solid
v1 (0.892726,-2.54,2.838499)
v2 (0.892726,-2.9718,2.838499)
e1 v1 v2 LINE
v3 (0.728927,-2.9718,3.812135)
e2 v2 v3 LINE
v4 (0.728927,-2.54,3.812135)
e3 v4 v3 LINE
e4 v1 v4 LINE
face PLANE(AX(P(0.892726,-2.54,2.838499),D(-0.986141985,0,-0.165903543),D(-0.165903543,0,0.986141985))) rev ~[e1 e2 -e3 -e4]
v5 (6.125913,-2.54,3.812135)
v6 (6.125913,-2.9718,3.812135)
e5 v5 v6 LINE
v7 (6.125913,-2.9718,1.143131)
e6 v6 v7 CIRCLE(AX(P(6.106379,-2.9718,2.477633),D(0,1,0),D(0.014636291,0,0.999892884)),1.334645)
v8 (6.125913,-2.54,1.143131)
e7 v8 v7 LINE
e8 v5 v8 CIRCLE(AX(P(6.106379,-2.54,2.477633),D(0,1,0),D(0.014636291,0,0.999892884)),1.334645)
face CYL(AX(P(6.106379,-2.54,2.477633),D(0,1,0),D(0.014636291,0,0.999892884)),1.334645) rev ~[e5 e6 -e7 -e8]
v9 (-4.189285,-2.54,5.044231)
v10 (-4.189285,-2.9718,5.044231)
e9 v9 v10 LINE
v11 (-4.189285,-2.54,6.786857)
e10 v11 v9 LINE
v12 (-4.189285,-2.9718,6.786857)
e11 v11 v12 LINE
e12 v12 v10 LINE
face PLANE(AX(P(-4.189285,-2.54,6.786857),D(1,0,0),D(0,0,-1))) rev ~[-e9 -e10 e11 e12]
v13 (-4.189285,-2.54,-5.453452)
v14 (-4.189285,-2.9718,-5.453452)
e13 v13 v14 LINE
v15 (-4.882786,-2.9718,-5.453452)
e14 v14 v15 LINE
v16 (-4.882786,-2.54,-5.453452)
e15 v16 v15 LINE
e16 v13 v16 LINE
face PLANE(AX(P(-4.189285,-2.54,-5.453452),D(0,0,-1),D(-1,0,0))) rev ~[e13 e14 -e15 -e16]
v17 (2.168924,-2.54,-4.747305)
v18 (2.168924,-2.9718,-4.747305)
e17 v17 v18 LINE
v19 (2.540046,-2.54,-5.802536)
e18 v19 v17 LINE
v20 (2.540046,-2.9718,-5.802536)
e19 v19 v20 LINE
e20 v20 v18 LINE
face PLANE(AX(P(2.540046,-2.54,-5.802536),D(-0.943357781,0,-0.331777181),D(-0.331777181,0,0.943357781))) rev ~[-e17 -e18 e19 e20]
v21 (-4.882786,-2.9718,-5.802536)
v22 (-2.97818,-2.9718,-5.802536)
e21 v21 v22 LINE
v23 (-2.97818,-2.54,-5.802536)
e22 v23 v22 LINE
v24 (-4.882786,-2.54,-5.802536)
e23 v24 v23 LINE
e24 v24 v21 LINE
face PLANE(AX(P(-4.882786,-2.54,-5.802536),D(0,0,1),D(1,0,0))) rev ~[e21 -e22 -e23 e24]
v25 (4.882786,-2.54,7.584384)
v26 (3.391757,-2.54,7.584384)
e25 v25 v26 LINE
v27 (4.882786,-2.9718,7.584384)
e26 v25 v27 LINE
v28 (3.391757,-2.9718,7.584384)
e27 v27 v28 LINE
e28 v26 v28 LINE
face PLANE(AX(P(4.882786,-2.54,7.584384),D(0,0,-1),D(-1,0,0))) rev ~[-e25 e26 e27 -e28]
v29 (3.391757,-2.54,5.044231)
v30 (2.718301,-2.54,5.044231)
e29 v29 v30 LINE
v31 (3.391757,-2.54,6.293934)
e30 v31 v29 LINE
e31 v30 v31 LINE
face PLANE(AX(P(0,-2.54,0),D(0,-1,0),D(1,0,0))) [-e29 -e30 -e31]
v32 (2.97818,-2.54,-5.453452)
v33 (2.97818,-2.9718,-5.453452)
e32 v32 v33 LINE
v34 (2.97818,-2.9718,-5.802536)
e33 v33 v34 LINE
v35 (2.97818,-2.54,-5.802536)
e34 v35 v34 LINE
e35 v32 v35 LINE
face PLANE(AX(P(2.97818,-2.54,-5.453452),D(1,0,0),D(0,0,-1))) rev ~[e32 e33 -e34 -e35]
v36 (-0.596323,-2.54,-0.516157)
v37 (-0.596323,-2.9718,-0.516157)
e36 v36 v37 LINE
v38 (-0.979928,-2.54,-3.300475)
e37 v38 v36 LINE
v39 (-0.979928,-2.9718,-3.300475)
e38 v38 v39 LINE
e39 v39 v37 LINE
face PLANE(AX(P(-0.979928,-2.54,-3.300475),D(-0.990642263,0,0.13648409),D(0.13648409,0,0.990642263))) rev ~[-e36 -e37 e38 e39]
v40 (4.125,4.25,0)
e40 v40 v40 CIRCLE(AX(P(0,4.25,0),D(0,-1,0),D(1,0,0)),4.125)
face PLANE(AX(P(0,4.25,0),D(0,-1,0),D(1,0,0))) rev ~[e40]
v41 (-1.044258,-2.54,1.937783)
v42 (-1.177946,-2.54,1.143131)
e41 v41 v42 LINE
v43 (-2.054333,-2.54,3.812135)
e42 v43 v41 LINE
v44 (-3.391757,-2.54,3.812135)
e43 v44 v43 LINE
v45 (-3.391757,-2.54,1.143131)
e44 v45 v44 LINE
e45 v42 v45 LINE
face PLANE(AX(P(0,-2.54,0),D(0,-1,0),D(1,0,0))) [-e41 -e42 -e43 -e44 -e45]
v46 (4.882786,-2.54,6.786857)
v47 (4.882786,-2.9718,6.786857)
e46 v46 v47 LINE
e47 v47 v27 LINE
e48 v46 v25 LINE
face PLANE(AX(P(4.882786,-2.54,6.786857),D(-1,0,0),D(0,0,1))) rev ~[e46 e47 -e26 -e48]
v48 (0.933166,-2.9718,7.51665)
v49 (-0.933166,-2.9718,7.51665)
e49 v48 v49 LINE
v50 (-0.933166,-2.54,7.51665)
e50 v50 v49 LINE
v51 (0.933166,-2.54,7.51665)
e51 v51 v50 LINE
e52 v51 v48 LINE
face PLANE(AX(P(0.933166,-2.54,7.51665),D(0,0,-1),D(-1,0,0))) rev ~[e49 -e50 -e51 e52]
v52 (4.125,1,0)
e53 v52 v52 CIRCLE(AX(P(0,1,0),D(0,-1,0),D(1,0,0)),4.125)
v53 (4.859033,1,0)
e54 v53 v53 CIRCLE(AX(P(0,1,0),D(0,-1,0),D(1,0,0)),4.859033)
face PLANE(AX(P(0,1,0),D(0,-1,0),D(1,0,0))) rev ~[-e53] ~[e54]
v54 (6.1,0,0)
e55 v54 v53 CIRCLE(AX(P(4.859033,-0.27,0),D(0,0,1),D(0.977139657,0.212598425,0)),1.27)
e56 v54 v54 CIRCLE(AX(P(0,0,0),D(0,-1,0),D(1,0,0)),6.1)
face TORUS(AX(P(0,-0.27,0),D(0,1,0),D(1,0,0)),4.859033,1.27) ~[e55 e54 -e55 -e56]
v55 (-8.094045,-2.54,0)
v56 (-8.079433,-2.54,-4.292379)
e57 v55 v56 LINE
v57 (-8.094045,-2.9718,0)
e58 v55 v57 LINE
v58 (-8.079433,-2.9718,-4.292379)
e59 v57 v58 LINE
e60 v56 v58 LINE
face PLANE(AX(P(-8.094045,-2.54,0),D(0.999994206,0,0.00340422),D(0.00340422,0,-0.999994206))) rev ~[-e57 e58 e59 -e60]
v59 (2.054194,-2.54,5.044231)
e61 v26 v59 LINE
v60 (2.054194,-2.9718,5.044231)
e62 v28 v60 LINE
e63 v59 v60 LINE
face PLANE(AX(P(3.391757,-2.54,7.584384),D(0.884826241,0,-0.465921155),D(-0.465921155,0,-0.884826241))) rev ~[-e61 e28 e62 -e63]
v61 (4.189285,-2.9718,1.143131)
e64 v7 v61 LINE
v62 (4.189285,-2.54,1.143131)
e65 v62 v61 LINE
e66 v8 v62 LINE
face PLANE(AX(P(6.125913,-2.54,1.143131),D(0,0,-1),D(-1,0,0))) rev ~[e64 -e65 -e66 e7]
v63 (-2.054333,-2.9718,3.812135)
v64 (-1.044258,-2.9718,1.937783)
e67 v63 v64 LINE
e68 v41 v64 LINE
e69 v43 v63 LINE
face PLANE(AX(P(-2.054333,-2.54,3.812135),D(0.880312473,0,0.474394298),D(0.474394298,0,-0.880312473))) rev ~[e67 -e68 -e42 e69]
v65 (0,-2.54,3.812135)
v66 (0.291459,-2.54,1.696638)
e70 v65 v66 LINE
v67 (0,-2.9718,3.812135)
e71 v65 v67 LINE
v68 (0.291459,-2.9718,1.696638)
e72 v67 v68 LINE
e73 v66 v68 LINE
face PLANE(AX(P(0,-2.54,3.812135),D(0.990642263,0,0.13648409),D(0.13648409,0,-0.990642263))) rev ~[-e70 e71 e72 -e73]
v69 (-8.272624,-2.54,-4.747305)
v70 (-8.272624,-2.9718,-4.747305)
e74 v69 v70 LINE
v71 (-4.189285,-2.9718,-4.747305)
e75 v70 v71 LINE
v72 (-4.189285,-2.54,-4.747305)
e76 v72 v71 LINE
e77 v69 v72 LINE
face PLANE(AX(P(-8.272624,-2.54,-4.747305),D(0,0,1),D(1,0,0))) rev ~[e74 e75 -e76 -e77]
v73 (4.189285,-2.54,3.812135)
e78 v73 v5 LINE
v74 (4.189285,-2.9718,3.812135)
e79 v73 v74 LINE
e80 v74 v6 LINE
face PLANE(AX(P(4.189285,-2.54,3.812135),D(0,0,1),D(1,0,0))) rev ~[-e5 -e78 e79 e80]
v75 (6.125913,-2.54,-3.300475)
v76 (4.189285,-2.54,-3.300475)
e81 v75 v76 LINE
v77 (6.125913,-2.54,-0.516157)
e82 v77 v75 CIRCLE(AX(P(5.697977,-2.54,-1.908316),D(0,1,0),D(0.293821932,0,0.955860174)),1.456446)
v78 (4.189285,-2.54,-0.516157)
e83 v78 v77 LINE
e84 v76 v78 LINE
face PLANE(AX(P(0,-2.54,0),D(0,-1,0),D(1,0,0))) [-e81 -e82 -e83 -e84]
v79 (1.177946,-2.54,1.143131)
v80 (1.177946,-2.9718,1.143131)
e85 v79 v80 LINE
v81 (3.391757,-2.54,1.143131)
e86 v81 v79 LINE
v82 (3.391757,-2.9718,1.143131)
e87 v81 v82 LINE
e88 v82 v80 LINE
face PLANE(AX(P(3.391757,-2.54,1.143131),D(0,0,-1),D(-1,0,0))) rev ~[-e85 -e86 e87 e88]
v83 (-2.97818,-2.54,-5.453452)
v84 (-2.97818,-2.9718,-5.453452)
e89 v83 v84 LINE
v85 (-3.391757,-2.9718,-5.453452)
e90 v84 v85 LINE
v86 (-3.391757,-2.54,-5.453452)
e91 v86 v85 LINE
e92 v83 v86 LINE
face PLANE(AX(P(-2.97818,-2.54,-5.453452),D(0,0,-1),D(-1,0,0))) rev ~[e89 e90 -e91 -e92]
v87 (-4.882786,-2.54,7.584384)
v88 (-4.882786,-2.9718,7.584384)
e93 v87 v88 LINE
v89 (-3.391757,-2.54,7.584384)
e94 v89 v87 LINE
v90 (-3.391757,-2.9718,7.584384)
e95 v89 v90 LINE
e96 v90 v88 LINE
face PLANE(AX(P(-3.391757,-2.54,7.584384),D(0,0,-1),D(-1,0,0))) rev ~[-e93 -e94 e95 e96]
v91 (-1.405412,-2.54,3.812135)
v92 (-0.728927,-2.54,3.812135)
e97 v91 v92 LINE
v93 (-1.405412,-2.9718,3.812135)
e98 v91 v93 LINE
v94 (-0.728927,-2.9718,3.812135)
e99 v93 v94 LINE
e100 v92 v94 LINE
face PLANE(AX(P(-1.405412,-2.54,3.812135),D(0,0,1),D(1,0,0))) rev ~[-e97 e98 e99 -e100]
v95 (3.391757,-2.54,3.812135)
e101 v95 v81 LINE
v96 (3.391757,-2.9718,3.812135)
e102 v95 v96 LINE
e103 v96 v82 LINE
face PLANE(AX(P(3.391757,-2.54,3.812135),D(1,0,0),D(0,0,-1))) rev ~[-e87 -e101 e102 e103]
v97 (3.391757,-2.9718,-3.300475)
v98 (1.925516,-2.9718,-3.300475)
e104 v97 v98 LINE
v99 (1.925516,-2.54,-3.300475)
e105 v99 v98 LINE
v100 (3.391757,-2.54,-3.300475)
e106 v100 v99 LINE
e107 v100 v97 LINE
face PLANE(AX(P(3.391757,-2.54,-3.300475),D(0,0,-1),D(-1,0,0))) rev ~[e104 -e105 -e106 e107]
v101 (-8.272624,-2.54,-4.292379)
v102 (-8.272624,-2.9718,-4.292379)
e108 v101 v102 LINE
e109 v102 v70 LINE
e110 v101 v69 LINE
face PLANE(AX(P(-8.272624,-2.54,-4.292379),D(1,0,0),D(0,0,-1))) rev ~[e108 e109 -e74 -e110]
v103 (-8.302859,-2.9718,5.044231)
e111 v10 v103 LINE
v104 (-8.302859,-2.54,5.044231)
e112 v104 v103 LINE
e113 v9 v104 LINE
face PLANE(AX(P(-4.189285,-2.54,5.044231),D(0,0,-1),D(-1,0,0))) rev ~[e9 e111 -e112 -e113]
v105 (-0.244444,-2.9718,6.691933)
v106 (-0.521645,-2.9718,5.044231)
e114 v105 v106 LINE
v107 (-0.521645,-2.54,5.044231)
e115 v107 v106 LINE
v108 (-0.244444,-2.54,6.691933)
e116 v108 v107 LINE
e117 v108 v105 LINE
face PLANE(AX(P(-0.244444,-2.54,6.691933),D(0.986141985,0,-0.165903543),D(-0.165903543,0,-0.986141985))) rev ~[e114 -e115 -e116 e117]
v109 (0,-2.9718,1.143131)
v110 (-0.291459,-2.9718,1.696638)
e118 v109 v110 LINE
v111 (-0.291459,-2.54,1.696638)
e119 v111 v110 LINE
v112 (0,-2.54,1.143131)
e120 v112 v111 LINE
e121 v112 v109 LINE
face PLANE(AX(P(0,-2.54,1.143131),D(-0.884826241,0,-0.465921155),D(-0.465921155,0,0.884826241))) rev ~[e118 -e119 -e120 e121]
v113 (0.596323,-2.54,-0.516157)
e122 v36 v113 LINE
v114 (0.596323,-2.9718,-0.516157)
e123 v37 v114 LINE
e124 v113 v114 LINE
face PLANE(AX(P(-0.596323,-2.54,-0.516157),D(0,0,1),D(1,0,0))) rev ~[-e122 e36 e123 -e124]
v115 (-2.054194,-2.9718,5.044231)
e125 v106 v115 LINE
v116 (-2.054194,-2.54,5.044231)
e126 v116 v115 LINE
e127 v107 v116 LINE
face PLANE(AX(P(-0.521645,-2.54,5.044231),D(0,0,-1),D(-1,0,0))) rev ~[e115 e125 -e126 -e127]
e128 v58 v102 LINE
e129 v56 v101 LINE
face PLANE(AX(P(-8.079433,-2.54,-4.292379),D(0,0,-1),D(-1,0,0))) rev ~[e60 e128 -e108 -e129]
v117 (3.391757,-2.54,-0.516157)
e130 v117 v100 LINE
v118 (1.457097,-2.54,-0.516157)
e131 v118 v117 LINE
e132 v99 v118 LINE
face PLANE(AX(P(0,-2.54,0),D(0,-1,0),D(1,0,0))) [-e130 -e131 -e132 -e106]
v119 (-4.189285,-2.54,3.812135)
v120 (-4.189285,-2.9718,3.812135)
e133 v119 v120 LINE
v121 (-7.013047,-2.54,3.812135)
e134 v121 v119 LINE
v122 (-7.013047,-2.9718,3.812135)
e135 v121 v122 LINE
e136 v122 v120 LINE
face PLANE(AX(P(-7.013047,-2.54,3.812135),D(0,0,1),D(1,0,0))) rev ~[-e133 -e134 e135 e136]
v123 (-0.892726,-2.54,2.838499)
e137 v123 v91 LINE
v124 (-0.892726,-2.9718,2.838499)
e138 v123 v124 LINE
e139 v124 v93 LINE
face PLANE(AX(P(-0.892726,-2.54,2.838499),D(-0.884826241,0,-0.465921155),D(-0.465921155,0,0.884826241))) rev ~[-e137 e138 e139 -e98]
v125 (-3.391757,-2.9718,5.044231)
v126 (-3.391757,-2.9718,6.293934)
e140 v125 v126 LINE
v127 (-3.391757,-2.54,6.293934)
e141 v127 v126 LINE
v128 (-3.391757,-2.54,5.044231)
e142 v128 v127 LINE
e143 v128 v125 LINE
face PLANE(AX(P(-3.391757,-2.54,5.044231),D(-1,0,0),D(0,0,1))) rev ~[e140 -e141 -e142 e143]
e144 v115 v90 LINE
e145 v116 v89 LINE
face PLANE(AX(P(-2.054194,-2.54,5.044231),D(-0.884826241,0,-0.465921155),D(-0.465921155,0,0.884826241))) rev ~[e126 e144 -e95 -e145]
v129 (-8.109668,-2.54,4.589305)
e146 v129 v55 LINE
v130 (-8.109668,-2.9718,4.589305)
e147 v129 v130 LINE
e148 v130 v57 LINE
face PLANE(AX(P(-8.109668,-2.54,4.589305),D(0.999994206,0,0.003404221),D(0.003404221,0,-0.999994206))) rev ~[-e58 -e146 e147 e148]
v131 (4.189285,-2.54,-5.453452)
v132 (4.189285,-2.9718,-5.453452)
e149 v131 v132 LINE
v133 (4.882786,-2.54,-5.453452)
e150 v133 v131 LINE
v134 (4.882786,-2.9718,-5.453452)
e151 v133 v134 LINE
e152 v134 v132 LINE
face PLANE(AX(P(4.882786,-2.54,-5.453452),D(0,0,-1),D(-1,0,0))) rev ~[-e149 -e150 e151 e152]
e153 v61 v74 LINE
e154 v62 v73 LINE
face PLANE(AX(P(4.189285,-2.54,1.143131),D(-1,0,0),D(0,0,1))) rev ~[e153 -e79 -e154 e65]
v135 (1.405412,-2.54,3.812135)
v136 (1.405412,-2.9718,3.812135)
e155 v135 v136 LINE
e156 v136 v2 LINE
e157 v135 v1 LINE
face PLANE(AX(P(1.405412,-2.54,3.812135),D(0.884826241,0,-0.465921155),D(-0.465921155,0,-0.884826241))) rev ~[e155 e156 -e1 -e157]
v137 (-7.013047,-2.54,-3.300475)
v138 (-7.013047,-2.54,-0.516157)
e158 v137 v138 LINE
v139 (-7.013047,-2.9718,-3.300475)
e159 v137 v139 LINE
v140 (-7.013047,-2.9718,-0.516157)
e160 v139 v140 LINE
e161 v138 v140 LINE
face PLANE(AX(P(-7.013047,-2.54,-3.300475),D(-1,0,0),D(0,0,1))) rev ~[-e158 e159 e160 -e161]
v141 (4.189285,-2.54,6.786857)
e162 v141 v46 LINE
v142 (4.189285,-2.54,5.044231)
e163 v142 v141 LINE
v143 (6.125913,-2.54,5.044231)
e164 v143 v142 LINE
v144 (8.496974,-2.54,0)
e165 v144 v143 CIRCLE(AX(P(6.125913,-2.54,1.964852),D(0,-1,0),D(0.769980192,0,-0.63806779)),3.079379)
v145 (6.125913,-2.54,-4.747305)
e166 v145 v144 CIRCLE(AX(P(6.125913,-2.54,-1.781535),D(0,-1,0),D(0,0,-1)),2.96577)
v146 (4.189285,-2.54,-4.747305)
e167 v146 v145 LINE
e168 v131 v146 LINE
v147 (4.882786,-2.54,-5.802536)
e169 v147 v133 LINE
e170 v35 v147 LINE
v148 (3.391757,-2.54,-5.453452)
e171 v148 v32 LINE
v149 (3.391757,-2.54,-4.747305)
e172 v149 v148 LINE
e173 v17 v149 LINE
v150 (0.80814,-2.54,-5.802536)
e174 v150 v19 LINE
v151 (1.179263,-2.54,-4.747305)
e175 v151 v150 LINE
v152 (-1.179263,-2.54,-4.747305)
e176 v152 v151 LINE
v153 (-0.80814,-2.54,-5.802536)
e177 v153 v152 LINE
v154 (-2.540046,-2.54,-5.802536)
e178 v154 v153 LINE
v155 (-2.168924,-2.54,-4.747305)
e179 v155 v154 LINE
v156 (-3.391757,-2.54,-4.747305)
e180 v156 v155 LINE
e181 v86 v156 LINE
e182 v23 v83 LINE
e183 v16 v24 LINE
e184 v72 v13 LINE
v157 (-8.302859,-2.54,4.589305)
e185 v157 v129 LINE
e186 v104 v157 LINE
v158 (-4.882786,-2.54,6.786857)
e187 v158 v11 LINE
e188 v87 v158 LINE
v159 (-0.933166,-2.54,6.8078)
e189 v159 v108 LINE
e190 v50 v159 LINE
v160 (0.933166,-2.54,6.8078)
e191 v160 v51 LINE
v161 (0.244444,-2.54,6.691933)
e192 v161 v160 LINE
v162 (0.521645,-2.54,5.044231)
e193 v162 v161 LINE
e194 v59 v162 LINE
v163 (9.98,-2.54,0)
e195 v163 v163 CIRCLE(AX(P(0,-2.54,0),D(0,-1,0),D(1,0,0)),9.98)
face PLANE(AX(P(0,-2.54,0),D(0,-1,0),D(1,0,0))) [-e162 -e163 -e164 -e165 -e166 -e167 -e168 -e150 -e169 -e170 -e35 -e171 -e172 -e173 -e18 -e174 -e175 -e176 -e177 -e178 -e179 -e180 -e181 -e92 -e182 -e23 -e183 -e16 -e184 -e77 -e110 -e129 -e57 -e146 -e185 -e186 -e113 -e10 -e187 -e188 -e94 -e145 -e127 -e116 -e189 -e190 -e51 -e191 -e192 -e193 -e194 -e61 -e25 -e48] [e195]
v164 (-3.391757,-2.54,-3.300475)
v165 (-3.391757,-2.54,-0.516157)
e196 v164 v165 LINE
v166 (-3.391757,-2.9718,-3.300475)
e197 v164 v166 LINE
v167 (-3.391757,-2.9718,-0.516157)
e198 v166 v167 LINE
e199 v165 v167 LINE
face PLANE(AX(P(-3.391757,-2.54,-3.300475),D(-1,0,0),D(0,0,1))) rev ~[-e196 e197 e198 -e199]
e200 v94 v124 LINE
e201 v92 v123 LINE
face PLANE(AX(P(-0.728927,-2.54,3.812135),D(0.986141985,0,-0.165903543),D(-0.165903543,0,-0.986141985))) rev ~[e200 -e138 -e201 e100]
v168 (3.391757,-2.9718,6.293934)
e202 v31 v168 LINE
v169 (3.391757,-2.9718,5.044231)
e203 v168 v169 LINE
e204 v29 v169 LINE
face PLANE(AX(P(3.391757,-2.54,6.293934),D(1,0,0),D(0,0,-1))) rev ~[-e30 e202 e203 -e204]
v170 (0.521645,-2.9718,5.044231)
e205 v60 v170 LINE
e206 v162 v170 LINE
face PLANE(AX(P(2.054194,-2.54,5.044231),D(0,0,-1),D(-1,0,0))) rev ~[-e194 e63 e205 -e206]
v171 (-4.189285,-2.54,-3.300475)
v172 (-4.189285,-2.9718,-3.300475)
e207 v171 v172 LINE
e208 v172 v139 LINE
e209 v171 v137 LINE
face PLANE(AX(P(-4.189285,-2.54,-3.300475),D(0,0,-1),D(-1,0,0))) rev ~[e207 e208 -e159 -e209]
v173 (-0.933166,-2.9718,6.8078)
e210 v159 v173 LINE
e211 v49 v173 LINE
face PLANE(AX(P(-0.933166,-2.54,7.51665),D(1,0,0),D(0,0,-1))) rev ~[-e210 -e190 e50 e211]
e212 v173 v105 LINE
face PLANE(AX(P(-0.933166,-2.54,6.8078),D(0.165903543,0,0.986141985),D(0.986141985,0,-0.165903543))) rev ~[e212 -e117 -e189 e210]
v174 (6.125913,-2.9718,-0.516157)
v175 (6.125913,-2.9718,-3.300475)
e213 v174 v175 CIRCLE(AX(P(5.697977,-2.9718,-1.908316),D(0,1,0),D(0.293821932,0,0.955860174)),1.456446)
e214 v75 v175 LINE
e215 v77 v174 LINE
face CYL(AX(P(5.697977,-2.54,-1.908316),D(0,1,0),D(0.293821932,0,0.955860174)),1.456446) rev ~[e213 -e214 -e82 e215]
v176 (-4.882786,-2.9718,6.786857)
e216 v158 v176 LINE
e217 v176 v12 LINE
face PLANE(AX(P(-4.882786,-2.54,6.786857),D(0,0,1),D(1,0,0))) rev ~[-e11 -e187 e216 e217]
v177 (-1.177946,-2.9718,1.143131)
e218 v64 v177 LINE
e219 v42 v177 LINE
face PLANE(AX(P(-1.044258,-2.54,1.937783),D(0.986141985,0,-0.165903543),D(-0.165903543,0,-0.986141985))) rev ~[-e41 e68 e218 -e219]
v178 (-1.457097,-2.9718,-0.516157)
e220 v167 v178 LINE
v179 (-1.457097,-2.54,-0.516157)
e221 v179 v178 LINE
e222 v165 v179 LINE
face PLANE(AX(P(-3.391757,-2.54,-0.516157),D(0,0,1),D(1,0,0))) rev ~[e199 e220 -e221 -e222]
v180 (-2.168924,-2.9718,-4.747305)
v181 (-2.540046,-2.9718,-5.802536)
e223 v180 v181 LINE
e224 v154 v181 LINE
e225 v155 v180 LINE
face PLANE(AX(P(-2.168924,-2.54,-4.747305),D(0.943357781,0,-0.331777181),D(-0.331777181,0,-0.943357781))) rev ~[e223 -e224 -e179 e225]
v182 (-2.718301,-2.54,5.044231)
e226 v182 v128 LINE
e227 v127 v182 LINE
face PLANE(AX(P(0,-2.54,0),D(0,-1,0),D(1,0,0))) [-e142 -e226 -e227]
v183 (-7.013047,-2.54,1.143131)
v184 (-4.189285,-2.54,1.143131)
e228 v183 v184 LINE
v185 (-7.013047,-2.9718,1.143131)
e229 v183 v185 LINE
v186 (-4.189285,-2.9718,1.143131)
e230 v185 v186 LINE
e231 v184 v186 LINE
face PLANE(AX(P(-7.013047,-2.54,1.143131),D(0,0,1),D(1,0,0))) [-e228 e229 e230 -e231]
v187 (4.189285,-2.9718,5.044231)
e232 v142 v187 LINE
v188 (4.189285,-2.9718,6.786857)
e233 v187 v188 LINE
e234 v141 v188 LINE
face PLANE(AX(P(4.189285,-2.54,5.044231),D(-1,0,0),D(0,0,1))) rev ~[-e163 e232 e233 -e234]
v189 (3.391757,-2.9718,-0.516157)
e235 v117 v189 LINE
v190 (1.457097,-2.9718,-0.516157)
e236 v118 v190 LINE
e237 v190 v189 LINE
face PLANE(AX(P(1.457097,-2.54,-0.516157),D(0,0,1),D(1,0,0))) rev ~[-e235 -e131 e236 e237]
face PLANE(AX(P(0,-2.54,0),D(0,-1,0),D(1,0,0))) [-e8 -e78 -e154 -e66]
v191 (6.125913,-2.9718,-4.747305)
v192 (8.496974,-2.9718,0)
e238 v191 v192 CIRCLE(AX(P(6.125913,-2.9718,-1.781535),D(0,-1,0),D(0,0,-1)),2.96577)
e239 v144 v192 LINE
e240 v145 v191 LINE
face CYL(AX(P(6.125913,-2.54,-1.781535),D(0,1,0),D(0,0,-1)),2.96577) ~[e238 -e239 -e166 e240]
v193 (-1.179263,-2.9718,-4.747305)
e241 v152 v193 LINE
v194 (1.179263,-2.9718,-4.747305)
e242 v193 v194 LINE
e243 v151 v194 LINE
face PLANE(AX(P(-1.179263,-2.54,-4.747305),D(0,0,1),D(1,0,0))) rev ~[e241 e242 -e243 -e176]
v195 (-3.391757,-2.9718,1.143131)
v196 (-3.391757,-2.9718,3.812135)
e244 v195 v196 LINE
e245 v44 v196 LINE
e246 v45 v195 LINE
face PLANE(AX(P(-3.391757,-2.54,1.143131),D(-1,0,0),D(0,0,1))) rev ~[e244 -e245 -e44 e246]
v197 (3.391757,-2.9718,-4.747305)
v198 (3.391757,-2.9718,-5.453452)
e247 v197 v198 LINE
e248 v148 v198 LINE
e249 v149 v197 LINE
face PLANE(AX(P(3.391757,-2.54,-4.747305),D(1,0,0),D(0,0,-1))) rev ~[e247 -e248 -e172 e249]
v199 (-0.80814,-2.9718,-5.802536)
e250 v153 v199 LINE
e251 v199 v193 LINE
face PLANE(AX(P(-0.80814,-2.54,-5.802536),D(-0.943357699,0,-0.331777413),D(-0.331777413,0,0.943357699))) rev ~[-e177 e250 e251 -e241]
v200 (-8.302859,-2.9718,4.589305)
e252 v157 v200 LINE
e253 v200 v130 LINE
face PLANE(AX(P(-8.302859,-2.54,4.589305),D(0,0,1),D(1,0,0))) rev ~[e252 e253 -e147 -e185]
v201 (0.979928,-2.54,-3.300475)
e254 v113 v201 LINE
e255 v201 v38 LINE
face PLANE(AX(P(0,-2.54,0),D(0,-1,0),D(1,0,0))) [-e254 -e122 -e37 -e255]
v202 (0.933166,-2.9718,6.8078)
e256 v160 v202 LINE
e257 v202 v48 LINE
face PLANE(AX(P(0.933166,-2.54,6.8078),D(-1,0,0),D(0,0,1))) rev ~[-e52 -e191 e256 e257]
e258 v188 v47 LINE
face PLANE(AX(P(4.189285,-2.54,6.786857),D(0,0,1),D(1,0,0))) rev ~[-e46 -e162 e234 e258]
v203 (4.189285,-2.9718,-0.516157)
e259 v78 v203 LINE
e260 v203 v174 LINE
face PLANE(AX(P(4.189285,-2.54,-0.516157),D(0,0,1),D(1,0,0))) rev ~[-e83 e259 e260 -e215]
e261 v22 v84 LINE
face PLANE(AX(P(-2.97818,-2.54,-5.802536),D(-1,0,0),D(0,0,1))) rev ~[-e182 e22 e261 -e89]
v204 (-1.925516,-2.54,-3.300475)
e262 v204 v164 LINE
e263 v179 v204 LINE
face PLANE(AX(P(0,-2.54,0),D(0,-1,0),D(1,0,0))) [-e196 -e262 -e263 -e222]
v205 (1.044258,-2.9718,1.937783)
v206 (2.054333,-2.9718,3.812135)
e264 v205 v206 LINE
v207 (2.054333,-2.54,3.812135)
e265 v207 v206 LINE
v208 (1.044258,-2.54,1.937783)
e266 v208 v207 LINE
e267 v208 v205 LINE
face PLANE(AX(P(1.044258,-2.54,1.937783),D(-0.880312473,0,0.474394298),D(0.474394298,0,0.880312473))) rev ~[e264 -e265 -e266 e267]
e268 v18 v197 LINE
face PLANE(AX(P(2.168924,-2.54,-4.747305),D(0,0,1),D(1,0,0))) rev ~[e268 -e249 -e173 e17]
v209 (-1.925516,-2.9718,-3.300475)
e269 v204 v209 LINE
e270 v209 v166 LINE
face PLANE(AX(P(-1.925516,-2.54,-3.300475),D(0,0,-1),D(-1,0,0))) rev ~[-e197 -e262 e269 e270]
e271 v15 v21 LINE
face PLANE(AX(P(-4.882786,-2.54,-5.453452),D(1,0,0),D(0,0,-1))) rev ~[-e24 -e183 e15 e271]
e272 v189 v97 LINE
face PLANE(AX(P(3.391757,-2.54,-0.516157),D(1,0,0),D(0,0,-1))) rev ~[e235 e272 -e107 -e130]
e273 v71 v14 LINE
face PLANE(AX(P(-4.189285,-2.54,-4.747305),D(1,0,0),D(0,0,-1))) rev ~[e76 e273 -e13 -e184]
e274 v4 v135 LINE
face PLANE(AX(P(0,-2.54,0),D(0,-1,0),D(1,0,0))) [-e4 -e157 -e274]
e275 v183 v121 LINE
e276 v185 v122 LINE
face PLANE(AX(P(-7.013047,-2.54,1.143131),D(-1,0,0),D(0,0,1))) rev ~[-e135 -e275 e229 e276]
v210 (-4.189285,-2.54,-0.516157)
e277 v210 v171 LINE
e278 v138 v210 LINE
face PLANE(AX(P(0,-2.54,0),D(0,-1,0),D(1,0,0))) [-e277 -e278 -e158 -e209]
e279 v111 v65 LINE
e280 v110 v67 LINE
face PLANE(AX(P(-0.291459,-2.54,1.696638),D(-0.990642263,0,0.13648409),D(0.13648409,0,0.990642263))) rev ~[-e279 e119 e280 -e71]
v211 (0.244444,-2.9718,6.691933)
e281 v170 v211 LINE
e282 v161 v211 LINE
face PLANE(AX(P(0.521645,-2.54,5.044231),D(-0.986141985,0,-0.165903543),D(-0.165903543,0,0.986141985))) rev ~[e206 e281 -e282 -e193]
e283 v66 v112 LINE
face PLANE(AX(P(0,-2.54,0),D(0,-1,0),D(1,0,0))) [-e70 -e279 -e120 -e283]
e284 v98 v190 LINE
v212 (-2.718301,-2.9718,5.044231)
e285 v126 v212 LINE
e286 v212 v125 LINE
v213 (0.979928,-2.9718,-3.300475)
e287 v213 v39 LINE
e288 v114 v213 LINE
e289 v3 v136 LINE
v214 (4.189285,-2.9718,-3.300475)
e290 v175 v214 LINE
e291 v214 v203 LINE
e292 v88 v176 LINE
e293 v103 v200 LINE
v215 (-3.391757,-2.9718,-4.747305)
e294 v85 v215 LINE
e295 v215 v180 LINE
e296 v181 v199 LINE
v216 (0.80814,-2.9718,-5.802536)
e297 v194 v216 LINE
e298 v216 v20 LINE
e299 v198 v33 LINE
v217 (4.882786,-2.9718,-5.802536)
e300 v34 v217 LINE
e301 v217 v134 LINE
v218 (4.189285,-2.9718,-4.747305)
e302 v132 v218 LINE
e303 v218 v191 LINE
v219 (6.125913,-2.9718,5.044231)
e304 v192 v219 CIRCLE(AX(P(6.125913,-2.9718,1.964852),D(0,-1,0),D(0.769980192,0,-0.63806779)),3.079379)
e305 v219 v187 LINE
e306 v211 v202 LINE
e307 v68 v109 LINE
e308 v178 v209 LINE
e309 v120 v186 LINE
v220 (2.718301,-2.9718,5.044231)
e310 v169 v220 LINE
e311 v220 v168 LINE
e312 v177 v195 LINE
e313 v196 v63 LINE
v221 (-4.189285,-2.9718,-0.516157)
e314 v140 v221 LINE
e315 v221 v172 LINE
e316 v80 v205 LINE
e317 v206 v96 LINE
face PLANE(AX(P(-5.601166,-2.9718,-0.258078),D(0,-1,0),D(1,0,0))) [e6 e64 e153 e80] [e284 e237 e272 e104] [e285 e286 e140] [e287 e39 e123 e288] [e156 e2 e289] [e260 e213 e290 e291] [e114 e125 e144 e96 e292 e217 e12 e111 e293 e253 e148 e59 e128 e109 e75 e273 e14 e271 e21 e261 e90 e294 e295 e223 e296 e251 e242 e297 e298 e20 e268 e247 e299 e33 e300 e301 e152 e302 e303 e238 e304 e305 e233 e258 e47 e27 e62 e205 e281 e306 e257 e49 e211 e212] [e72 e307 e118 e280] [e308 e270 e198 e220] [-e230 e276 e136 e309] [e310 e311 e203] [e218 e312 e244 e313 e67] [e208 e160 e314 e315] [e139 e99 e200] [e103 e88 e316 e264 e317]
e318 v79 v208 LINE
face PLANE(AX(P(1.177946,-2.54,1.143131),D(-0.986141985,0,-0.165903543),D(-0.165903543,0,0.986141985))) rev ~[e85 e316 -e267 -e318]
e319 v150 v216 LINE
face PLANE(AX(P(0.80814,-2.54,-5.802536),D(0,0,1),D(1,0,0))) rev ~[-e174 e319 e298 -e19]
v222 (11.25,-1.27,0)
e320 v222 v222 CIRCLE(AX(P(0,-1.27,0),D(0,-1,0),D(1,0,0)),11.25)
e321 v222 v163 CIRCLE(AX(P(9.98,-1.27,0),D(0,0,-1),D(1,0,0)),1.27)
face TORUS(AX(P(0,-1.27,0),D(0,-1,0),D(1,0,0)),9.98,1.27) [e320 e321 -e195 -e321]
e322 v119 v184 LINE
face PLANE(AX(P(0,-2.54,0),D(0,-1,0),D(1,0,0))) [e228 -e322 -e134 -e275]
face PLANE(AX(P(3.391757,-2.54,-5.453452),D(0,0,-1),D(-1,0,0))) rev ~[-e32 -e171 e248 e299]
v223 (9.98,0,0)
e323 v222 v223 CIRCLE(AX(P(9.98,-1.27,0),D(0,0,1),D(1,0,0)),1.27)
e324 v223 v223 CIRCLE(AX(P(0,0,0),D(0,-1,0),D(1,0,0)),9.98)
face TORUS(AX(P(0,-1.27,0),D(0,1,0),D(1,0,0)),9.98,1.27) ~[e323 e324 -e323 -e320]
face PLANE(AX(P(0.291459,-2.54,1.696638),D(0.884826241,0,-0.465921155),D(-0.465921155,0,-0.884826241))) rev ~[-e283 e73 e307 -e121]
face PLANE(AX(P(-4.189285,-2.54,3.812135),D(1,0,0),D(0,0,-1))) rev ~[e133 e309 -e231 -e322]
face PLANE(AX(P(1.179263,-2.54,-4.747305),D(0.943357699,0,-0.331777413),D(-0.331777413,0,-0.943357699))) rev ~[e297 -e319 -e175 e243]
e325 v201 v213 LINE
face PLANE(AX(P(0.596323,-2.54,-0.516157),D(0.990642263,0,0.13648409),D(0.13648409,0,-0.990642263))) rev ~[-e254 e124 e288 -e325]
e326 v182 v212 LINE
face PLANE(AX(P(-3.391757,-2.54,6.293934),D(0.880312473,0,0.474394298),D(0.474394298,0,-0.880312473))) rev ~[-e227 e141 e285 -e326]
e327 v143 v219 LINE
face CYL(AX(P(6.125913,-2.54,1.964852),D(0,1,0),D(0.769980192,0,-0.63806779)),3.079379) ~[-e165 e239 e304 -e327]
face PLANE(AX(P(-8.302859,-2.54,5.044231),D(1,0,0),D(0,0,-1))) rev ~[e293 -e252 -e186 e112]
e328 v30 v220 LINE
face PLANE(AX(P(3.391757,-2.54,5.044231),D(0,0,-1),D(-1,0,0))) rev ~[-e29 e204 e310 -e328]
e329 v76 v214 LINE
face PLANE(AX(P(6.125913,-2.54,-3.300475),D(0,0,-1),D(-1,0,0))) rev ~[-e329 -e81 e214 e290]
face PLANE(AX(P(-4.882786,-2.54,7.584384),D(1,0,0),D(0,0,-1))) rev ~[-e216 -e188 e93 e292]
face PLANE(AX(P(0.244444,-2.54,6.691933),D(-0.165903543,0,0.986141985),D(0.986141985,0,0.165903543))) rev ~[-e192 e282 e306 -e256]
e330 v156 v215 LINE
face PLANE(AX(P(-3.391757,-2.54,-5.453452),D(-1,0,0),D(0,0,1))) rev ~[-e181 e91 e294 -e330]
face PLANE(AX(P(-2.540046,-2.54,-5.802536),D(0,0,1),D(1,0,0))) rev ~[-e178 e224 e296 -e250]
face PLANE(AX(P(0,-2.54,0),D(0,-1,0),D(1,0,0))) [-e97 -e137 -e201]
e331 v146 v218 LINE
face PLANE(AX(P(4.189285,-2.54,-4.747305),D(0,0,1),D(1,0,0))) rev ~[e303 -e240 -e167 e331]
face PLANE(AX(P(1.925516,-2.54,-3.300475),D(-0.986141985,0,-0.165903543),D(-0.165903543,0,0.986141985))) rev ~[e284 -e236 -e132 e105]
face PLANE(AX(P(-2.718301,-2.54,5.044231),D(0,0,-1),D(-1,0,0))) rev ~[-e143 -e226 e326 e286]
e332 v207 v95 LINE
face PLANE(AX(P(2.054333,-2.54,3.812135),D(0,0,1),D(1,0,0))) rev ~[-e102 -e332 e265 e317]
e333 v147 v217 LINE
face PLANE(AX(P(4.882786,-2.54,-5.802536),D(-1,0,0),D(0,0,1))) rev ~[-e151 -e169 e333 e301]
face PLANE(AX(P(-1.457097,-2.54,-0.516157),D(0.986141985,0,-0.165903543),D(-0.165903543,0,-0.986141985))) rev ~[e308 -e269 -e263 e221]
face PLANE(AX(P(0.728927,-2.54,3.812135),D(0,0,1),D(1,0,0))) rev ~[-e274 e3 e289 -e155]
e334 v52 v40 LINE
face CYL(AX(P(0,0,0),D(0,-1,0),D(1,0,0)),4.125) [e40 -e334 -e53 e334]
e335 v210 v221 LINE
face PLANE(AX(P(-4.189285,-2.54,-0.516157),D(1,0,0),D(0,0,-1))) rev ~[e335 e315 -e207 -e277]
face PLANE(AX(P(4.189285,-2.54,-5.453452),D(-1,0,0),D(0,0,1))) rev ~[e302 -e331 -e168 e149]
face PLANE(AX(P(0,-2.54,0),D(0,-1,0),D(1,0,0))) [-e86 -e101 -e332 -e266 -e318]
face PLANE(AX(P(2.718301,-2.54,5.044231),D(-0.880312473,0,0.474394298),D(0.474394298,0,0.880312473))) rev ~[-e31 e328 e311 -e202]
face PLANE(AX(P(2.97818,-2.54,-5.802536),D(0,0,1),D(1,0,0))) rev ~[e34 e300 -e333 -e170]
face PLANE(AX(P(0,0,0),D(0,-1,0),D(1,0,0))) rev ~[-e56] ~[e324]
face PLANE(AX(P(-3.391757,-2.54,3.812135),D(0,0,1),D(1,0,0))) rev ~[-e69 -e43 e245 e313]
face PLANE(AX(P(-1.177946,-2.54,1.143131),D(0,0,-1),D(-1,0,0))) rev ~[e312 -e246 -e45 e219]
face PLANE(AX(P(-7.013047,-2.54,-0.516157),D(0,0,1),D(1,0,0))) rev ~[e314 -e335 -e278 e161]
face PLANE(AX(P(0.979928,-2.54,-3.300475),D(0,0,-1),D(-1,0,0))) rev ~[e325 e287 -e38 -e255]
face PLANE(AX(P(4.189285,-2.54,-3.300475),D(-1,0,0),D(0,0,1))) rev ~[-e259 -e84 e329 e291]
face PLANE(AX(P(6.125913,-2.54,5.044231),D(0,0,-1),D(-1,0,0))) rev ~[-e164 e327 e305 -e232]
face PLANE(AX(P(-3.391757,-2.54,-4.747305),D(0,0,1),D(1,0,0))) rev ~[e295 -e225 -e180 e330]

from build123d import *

# Parameters (mm, degrees)
F0_R     = 11.25
F0_R_2   = 6.1
F0_R_3   = 4.125
F1_DEPTH = 2.54
F2_DEPTH = 4.25
F3_DEPTH = 1
F5_W     = 2.82376213
F5_H     = 0.5161568988
F5_W_2   = 0.7975271437
F5_H_2   = 2.7843180578
F5_H_3   = 2.6690037921
F5_H_4   = 1.2320959941
F5_H_5   = 1.4468301088
F5_H_6   = 1.1431314051
F6_DEPTH = 0.4318


# Not quite as in the source:
# - a fillet or chamfer that OpenCascade refuses, or shapes differently, is made with other operations: its cross-section is extruded or revolved along the edge and cut away or added


with BuildPart() as f1:
    # F0 (on Front) → F1 (new body)
    with BuildSketch(Plane.XZ):
        Circle(F0_R)
        Circle(F0_R_2, mode=Mode.SUBTRACT)
        Circle(F0_R_2)
        Circle(F0_R_3, mode=Mode.SUBTRACT)
        Circle(F0_R_3)
    extrude(amount=F1_DEPTH)

    # F0 (on Front) → F2 (join)
    with BuildSketch(Plane.XZ):
        Circle(F0_R_3)
    extrude(amount=-F2_DEPTH)

    # F0 (on Front) → F3 (join)
    with BuildSketch(Plane.XZ):
        Circle(F0_R_2)
        Circle(F0_R_3, mode=Mode.SUBTRACT)
    extrude(amount=-F3_DEPTH)

    # F4: fillet of radius 1.27 on 3 edges, made by hand

    # F4_s1 → F4_t2 (revolve, cut)
    with BuildSketch(Plane.XY):
        with BuildLine():
            ThreePointArc((6.1, 0), (5.6559015079, 0.7188882647), (4.8590326354, 1))
            Line((4.8590326354, 1), (6.1, 1))
            Line((6.1, 1), (6.1, 0))
        make_face()
    revolve(axis=Axis((0, 1, 0), (0, -1, 0)), mode=Mode.SUBTRACT)

    # F4_s3 → F4_t4 (revolve, cut)
    with BuildSketch(Plane.XY):
        with BuildLine():
            ThreePointArc((11.25, -1.27), (10.8780256121, -0.3719743879), (9.98, 0))
            Line((9.98, 0), (11.25, 0))
            Line((11.25, 0), (11.25, -1.27))
        make_face()
    revolve(axis=Axis((0, 0, 0), (0, -1, 0)), mode=Mode.SUBTRACT)

    # F4_s5 → F4_t6 (revolve, cut)
    with BuildSketch(Plane.XY):
        with BuildLine():
            ThreePointArc((11.25, -1.27), (10.8780256121, -2.1680256121), (9.98, -2.54))
            Line((9.98, -2.54), (11.25, -2.54))
            Line((11.25, -2.54), (11.25, -1.27))
        make_face()
    revolve(axis=Axis((0, -2.54, 0), (0, -1, 0)), mode=Mode.SUBTRACT)

    # F5 (on face) → F6 (join)
    with BuildSketch(Plane.XZ.offset(2.54)):
        with Locations((-5.6011655834, -0.2580784494)):
            Rectangle(F5_W, F5_H)
        Polygon((-2.7183012693, 5.0442311913), (-2.0541941821, 5.0442311913), (-3.3917573746, 7.5843841769), (-4.882786423, 7.5843841769), (-4.882786423, 6.7868568003), (-4.1892845184, 6.7868568003), (-4.1892845184, 5.0442311913), (-3.3917573746, 5.0442311913), (-3.3917573746, 6.2939338386), align=None)
        Polygon((-0.3677175585, 1.1431314051), (0, 1.1431314051), (-0.2914590528, 1.6966384), align=None)
        Polygon((3.3917573746, 5.0442311913), (4.1892845184, 5.0442311913), (4.1892845184, 6.7868568003), (4.882786423, 6.7868568003), (4.882786423, 7.5843841769), (3.3917573746, 7.5843841769), (2.0541941821, 5.0442311913), (2.7183012693, 5.0442311913), (3.3917573746, 6.2939338386), align=None)
        Polygon((-0.521645051, 5.0442311913), (0.521645051, 5.0442311913), (0.2444440033, 6.6919331439), (0.9331664045, 6.8078003193), (0.9331664045, 7.516650483), (0, 7.516650483), (-0.9331664045, 7.516650483), (-0.9331664045, 6.8078003193), (-0.2444440033, 6.6919331439), align=None)
        Polygon((0.6160256007, 1.1431314051), (1.1779463597, 1.1431314051), (1.0442581093, 1.9377834924), align=None)
        Polygon((0, 1.1431314051), (0.3677175585, 1.1431314051), (0.2914590528, 1.6966384), align=None)
        with BuildLine():
            ThreePointArc((6.1259130016, 3.8121351972), (7.4410236088, 2.4776333012), (6.1259130016, 1.1431314051))
            Line((6.1259130016, 1.1431314051), (4.1892845184, 1.1431314051))
            Line((4.1892845184, 1.1431314051), (4.1892845184, 0))
            Line((4.1892845184, 0), (8.4969736636, 0))
            ThreePointArc((8.4969736636, 0), (8.9127659298, 3.2748235651), (6.1259130016, 5.0442311913))
            Line((6.1259130016, 5.0442311913), (5.1765339449, 5.0442311913))
            Line((5.1765339449, 5.0442311913), (4.1892845184, 5.0442311913))
            Line((4.1892845184, 5.0442311913), (4.1892845184, 3.8121351972))
            Line((4.1892845184, 3.8121351972), (6.1259130016, 3.8121351972))
        make_face()
        Polygon((-3.3917573746, -5.4534515366), (-3.3917573746, -4.7473050654), (-4.1892845184, -4.7473050654), (-4.1892845184, -5.4534515366), (-4.882786423, -5.4534515366), (-4.882786423, -5.8025359176), (-2.9781798366, -5.8025359176), (-2.9781798366, -5.4534515366), align=None)
        Polygon((-0.8081396227, -5.8025359176), (-1.1792626465, -4.7473050654), (-2.1689236164, -4.7473050654), (-2.5400463492, -5.8025359176), align=None)
        Polygon((2.5400463492, -5.8025359176), (2.1689236164, -4.7473050654), (1.1792626465, -4.7473050654), (0.8081396227, -5.8025359176), align=None)
        Polygon((4.1892845184, -5.4534515366), (4.1892845184, -4.7473050654), (3.3917573746, -4.7473050654), (3.3917573746, -5.4534515366), (2.9781798366, -5.4534515366), (2.9781798366, -5.8025359176), (4.882786423, -5.8025359176), (4.882786423, -5.4534515366), align=None)
        with Locations((-3.7905209465, -1.9083159277)):
            Rectangle(F5_W_2, F5_H_2)
        with Locations((-3.7905209465, -0.2580784494)):
            Rectangle(F5_W_2, F5_H)
        with Locations((-3.7905209465, 2.4776333012)):
            Rectangle(F5_W_2, F5_H_3)
        with Locations((-3.7905209465, 4.4281831942)):
            Rectangle(F5_W_2, F5_H_4)
        Polygon((-0.3677175585, 1.1431314051), (-0.2914590528, 1.6966384), (-0.8927262809, 2.8384990261), (-1.0442581093, 1.9377834924), (-0.6160256007, 1.1431314051), align=None)
        Polygon((-1.0442581093, 1.9377834924), (-0.8927262809, 2.8384990261), (-1.4054118998, 3.8121351972), (-2.0543332675, 3.8121351972), align=None)
        Polygon((-0.2914590528, 1.6966384), (0, 3.8121351972), (-0.728926653, 3.8121351972), (-0.8927262809, 2.8384990261), align=None)
        Polygon((0.2914590528, 1.6966384), (0.8927262809, 2.8384990261), (0.728926653, 3.8121351972), (0, 3.8121351972), align=None)
        Polygon((0.6160256007, 1.1431314051), (1.0442581093, 1.9377834924), (0.8927262809, 2.8384990261), (0.2914590528, 1.6966384), (0.3677175585, 1.1431314051), align=None)
        Polygon((0, 0), (0.4182745639, 0.7761735704), (0.3677175585, 1.1431314051), (0, 1.1431314051), (-0.3677175585, 1.1431314051), (-0.4182745639, 0.7761735704), align=None)
        with Locations((3.7905209465, -1.9083159277)):
            Rectangle(F5_W_2, F5_H_2)
        with Locations((3.7905209465, -0.2580784494)):
            Rectangle(F5_W_2, F5_H)
        with Locations((3.7905209465, 2.4776333012)):
            Rectangle(F5_W_2, F5_H_3)
        with Locations((3.7905209465, 4.4281831942)):
            Rectangle(F5_W_2, F5_H_4)
        Polygon((1.0442581093, 1.9377834924), (2.0543332675, 3.8121351972), (1.4054118998, 3.8121351972), (0.8927262809, 2.8384990261), align=None)
        Polygon((-0.6160256007, 1.1431314051), (-0.4182745639, 0.7761735704), (-0.3677175585, 1.1431314051), align=None)
        Polygon((0.4182745639, 0.7761735704), (0.6160256007, 1.1431314051), (0.3677175585, 1.1431314051), align=None)
        Polygon((-1.4054118998, 3.8121351972), (-2.0541941821, 5.0442311913), (-2.7183012693, 5.0442311913), (-2.0543332675, 3.8121351972), align=None)
        Polygon((1.4054118998, 3.8121351972), (2.0543332675, 3.8121351972), (2.7183012693, 5.0442311913), (2.0541941821, 5.0442311913), align=None)
        Polygon((-8.0940451721, 0), (-7.0130466484, 0), (-7.0130466484, 1.1431314051), (-7.0130466484, 3.8121351972), (-4.1892845184, 3.8121351972), (-4.1892845184, 5.0442311913), (-7.7138240449, 5.0442311913), (-8.3028590307, 5.0442311913), (-8.3028590307, 4.5893052593), (-8.1096682698, 4.5893052593), align=None)
        Polygon((2.0543332675, 3.8121351972), (3.3917573746, 3.8121351972), (3.3917573746, 5.0442311913), (2.7183012693, 5.0442311913), align=None)
        with Locations((-3.7905209465, -4.023890011)):
            Rectangle(F5_W_2, F5_H_5)
        Polygon((-2.0543332675, 3.8121351972), (-2.7183012693, 5.0442311913), (-3.3917573746, 5.0442311913), (-3.3917573746, 3.8121351972), align=None)
        Polygon((-0.728926653, 3.8121351972), (-0.521645051, 5.0442311913), (-2.0541941821, 5.0442311913), (-1.4054118998, 3.8121351972), align=None)
        Polygon((0, 3.8121351972), (0.728926653, 3.8121351972), (0.521645051, 5.0442311913), (-0.521645051, 5.0442311913), (-0.728926653, 3.8121351972), align=None)
        Polygon((0.728926653, 3.8121351972), (1.4054118998, 3.8121351972), (2.0541941821, 5.0442311913), (0.521645051, 5.0442311913), align=None)
        Polygon((-1.1779463597, 1.1431314051), (-0.6160256007, 1.1431314051), (-1.0442581093, 1.9377834924), align=None)
        Polygon((1.4570966365, -0.5161568988), (1.370261009, 0), (0.5252105866, 0), (0.5963232449, -0.5161568988), align=None)
        Polygon((3.3917573746, -0.5161568988), (3.3917573746, 0), (1.370261009, 0), (1.4570966365, -0.5161568988), align=None)
        Polygon((-3.3917573746, -0.5161568988), (-1.4570966365, -0.5161568988), (-1.370261009, 0), (-3.3917573746, 0), align=None)
        Polygon((-1.4570966365, -0.5161568988), (-0.5963232449, -0.5161568988), (-0.5252105866, 0), (-1.370261009, 0), align=None)
        Polygon((-0.9799280345, -3.3004749566), (-0.5963232449, -0.5161568988), (-1.4570966365, -0.5161568988), (-1.9255162324, -3.3004749566), align=None)
        Polygon((1.9255162324, -3.3004749566), (1.4570966365, -0.5161568988), (0.5963232449, -0.5161568988), (0.9799280345, -3.3004749566), align=None)
        Polygon((2.1689236164, -4.7473050654), (1.9255162324, -3.3004749566), (0.9799280345, -3.3004749566), (1.1792626465, -4.7473050654), align=None)
        Polygon((3.3917573746, -4.7473050654), (3.3917573746, -3.3004749566), (1.9255162324, -3.3004749566), (2.1689236164, -4.7473050654), align=None)
        with Locations((3.7905209465, -4.023890011)):
            Rectangle(F5_W_2, F5_H_5)
        Polygon((-1.1792626465, -4.7473050654), (-0.9799280345, -3.3004749566), (-1.9255162324, -3.3004749566), (-2.1689236164, -4.7473050654), align=None)
        Polygon((-2.1689236164, -4.7473050654), (-1.9255162324, -3.3004749566), (-3.3917573746, -3.3004749566), (-3.3917573746, -4.7473050654), align=None)
        Polygon((1.1792626465, -4.7473050654), (0.9799280345, -3.3004749566), (-0.9799280345, -3.3004749566), (-1.1792626465, -4.7473050654), align=None)
        Polygon((0.5963232449, -0.5161568988), (0.5252105866, 0), (0, 0), (-0.5252105866, 0), (-0.5963232449, -0.5161568988), align=None)
        with Locations((-5.6011655834, 0.5715657026)):
            Rectangle(F5_W, F5_H_6)
        with Locations((-3.7905209465, 0.5715657026)):
            Rectangle(F5_W_2, F5_H_6)
        Polygon((-3.3917573746, 0), (-1.370261009, 0), (-1.1779463597, 1.1431314051), (-3.3917573746, 1.1431314051), align=None)
        Polygon((-0.5252105866, 0), (-0.4182745639, 0.7761735704), (-0.6160256007, 1.1431314051), (-1.1779463597, 1.1431314051), (-1.370261009, 0), align=None)
        Polygon((-0.5252105866, 0), (0, 0), (-0.4182745639, 0.7761735704), align=None)
        Polygon((0, 0), (0.5252105866, 0), (0.4182745639, 0.7761735704), align=None)
        Polygon((1.370261009, 0), (1.1779463597, 1.1431314051), (0.6160256007, 1.1431314051), (0.4182745639, 0.7761735704), (0.5252105866, 0), align=None)
        Polygon((3.3917573746, 0), (3.3917573746, 1.1431314051), (1.1779463597, 1.1431314051), (1.370261009, 0), align=None)
        with Locations((3.7905209465, 0.5715657026)):
            Rectangle(F5_W_2, F5_H_6)
        with BuildLine():
            Line((8.4969736636, 0), (4.1892845184, 0))
            Line((4.1892845184, 0), (4.1892845184, -0.5161568988))
            Line((4.1892845184, -0.5161568988), (6.1259130016, -0.5161568988))
            ThreePointArc((6.1259130016, -0.5161568988), (7.1544234466, -1.9083159277), (6.1259130016, -3.3004749566))
            Line((6.1259130016, -3.3004749566), (4.1892845184, -3.3004749566))
            Line((4.1892845184, -3.3004749566), (4.1892845184, -4.7473050654))
            Line((4.1892845184, -4.7473050654), (6.1259130016, -4.7473050654))
            ThreePointArc((6.1259130016, -4.7473050654), (8.7791579039, -3.106708495), (8.4969736636, 0))
        make_face()
        Polygon((-4.1892845184, -4.7473050654), (-4.1892845184, -3.3004749566), (-7.0130466484, -3.3004749566), (-7.0130466484, -0.5161568988), (-7.0130466484, 0), (-8.0940451721, 0), (-8.0794328824, -4.2923791334), (-8.2726236433, -4.2923791334), (-8.2726236433, -4.7473050654), (-7.7138240449, -4.7473050654), (-7.6835886575, -4.7473050654), align=None)
    extrude(amount=F6_DEPTH)


solid = f1.part
